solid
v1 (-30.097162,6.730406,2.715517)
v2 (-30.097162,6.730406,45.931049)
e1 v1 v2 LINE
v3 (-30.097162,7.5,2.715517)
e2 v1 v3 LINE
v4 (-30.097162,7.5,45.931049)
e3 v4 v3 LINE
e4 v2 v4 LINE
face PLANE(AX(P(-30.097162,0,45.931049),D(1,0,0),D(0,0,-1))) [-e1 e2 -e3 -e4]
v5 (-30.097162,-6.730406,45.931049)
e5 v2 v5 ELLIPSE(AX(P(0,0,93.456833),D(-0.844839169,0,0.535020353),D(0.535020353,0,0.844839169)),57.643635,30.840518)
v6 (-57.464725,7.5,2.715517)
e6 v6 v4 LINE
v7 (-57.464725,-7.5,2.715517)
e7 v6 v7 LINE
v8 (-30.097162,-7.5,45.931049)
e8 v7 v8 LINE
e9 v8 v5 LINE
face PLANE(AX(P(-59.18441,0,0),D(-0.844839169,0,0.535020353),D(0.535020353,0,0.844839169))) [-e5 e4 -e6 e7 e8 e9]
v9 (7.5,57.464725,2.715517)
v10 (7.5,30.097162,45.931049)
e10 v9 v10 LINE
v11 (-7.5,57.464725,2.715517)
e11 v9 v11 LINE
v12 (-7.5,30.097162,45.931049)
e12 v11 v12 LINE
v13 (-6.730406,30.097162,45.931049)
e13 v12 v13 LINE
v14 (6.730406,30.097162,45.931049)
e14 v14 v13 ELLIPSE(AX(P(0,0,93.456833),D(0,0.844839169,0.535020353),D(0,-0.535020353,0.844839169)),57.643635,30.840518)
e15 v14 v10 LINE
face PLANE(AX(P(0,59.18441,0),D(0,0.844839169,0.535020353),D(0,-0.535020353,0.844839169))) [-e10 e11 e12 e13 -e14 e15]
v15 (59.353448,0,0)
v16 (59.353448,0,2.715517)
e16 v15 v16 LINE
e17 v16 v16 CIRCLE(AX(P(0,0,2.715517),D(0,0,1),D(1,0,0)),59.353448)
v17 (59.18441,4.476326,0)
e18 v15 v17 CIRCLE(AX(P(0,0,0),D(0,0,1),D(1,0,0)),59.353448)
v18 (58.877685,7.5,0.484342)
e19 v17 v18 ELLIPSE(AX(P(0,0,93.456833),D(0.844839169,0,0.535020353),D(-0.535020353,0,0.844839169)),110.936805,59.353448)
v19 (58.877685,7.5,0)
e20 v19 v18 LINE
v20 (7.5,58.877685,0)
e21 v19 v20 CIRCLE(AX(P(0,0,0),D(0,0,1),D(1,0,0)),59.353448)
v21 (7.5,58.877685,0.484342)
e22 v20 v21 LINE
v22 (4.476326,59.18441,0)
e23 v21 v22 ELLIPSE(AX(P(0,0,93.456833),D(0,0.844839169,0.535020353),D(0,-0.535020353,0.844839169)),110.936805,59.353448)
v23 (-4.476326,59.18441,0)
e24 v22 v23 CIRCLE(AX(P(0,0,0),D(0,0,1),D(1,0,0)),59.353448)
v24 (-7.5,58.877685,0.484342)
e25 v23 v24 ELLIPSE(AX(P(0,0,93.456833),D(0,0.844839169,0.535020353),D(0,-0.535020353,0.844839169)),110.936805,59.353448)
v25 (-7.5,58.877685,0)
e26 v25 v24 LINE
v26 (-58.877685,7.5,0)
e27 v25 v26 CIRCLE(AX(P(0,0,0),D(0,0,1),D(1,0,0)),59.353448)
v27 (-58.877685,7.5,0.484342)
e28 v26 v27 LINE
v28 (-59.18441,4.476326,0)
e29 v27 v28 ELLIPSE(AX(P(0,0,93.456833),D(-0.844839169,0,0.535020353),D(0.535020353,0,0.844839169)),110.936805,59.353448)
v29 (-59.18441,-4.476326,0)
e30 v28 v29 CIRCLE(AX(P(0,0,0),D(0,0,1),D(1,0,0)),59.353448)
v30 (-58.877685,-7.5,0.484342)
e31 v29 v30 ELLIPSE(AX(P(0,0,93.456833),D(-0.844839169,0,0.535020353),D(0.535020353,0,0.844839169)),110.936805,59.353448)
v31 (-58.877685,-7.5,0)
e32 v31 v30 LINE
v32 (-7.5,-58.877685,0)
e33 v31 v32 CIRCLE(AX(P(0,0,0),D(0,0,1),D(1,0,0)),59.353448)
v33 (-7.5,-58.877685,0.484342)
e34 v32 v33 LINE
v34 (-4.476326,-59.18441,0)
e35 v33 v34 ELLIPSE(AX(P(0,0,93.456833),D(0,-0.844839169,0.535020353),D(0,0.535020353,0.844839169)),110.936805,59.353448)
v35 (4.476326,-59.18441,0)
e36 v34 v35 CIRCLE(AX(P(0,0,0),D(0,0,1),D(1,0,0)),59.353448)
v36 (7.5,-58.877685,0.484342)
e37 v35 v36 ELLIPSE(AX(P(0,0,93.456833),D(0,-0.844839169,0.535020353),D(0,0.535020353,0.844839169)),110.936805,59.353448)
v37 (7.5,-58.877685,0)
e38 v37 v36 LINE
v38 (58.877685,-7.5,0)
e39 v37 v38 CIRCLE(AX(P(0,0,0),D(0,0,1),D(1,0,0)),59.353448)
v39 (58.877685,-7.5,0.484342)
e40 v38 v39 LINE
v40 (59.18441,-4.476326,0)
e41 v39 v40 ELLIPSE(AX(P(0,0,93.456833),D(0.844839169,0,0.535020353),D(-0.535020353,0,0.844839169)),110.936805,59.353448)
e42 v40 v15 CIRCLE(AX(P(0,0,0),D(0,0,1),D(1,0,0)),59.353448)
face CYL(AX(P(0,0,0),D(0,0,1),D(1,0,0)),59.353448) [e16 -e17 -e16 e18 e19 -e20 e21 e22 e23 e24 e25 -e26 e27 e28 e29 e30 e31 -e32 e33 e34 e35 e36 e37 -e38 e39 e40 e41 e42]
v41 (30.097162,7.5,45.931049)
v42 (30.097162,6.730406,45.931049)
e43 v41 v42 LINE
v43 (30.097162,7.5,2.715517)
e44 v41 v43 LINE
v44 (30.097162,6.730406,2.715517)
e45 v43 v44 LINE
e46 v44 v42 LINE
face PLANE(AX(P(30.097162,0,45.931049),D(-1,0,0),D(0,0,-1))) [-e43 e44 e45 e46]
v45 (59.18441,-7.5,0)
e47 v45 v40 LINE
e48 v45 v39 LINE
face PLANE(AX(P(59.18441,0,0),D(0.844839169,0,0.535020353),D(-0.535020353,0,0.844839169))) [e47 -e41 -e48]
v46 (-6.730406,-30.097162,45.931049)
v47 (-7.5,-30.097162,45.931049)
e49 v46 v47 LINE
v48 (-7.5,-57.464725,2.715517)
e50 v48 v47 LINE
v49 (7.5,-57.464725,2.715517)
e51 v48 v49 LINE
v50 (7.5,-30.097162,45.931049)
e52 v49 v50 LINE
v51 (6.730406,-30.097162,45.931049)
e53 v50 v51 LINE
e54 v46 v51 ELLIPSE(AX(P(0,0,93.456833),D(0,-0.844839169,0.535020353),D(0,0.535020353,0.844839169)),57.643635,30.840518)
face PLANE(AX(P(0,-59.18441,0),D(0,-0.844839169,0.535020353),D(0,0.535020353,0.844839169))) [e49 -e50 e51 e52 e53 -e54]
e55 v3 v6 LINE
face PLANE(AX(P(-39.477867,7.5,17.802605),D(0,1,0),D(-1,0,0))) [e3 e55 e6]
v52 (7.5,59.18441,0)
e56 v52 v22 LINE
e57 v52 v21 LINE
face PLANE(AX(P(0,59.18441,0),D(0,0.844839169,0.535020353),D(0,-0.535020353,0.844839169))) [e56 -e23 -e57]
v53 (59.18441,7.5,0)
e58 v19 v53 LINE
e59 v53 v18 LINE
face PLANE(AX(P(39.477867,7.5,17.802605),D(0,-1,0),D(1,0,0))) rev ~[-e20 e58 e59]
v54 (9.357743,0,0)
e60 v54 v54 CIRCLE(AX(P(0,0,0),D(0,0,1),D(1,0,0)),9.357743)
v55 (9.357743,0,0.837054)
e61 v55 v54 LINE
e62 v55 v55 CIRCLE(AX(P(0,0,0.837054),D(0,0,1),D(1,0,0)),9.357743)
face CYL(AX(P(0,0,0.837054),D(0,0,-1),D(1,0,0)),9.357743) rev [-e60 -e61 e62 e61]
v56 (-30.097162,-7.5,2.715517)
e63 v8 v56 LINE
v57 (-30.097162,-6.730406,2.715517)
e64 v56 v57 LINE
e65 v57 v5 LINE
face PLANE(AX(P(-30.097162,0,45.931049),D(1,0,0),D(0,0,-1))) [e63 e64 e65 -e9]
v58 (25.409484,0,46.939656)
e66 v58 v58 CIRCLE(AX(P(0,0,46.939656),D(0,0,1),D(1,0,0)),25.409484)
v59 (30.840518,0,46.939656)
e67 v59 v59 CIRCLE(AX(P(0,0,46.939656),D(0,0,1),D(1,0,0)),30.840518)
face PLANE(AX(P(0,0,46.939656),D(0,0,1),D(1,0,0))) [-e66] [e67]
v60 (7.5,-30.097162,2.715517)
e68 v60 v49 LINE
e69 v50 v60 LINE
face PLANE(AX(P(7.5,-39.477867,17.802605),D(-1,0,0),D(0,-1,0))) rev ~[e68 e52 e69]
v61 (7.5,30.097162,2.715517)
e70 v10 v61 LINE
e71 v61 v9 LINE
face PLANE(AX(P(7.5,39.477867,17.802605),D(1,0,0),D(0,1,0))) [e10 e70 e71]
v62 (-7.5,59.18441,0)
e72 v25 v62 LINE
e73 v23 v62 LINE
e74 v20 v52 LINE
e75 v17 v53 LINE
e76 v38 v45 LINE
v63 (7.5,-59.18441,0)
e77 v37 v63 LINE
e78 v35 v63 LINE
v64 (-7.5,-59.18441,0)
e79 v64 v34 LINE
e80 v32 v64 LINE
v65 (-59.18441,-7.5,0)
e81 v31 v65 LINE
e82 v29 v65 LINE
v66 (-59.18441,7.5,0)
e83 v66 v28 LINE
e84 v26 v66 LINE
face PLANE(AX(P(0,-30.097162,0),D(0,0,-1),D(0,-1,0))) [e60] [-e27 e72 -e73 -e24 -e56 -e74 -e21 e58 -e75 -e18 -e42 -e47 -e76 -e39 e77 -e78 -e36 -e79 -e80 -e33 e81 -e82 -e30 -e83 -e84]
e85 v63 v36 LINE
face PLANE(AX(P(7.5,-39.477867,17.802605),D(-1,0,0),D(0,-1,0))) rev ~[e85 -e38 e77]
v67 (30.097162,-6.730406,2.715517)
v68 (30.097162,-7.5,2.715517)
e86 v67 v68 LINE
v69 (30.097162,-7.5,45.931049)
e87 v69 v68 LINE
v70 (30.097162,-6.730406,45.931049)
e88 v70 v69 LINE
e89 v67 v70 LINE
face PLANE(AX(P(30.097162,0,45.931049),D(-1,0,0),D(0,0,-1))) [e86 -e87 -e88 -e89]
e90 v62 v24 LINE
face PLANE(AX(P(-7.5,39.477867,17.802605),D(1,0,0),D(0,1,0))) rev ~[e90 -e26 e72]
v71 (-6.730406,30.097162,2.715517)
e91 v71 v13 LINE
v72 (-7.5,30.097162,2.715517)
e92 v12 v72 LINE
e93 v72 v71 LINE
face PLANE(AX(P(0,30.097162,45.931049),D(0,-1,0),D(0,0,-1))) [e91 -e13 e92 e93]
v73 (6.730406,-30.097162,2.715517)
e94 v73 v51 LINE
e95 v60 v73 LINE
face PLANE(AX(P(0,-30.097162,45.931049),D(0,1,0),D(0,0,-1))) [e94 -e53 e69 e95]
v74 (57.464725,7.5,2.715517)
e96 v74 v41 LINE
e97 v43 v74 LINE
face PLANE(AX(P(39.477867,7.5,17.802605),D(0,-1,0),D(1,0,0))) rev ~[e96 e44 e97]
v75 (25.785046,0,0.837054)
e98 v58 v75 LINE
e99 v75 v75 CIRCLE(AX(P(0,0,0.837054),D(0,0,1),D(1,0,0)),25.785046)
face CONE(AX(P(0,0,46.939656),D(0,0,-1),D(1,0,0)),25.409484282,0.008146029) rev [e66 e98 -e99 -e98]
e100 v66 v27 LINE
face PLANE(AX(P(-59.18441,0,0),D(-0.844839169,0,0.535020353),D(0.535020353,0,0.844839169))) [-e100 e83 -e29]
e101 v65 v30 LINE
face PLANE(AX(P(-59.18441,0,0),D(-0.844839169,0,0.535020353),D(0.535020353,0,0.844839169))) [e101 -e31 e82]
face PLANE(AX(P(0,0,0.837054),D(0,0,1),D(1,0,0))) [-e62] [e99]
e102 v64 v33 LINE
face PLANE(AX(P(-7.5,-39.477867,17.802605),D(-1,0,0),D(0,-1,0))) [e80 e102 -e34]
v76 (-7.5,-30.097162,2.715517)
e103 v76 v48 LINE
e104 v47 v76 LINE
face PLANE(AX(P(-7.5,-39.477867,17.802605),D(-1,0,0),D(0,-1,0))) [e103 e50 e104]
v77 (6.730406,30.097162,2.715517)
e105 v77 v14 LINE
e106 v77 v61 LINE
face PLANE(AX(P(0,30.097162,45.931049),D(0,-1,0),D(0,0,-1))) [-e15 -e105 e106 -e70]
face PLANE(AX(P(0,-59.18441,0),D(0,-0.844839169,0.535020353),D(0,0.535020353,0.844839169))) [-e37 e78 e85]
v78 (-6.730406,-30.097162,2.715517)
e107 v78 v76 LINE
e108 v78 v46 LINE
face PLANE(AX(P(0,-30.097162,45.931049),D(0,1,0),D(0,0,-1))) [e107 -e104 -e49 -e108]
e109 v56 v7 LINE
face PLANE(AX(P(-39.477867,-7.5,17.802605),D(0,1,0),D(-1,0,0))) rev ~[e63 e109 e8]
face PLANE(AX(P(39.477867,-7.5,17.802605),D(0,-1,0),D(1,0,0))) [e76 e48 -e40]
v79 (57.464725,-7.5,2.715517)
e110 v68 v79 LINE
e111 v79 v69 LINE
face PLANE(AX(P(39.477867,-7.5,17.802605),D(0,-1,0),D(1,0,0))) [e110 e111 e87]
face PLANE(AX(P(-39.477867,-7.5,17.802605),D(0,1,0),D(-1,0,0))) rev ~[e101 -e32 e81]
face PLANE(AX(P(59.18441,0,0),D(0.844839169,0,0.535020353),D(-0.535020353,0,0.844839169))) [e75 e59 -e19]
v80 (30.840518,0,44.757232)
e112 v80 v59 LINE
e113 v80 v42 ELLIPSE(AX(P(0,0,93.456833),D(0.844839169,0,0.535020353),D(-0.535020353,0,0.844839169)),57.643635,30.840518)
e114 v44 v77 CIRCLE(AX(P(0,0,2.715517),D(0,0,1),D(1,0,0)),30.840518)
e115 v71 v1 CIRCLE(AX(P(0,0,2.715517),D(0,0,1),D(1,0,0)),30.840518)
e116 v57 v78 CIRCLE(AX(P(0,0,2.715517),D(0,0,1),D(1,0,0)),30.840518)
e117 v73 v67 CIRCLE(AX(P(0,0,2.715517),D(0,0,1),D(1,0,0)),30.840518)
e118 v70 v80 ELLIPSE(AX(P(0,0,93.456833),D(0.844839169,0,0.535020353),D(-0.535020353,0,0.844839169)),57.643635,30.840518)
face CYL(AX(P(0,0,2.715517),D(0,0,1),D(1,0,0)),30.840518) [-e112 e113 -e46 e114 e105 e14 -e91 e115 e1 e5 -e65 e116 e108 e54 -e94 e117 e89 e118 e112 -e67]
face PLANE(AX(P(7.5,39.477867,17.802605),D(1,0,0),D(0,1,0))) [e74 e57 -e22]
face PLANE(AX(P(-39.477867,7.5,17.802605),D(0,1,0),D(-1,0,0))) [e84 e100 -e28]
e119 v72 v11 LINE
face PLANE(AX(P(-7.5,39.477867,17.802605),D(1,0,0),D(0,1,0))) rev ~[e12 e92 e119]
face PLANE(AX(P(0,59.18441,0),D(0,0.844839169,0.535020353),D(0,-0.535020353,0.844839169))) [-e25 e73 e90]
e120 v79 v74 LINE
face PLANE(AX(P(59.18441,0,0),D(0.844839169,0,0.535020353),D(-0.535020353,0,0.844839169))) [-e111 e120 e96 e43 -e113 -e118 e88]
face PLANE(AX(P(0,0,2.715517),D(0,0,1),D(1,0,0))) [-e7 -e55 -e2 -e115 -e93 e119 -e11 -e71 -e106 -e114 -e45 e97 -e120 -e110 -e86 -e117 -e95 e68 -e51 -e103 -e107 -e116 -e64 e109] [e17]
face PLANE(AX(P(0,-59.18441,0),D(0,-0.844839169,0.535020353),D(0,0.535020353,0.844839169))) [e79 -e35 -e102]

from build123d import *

# Parameters (mm, degrees)
F4_DEPTH        = 7.5
F4_COPIES_COUNT = 4


# Not quite as in the source:
# - a pattern or mirror of a feature is missing from the dataset's text; its kind, count and spacing are read off the source's solid


with BuildPart() as f2:
    # F0 (on Front) → F2 (revolve)
    with BuildSketch(Plane.XZ):
        Polygon((9.3577429652, 0), (59.3534484506, 0), (59.3534484506, 2.7155173011), (30.840517953, 2.7155173011), (30.840517953, 46.9396561384), (25.4094842821, 46.9396561384), (25.7850456983, 0.8370543364), (9.3577429652, 0.8370543364), align=None)
    revolve(axis=Axis((0, 0, 37.2192747891), (0, 0, 1)))

    # F3 (on Front) → F4 (join, symmetric)
    with BuildSketch(Plane.XZ):
        Polygon((59.184409678, 0), (30.097162351, 45.9310486913), (30.097162351, 0), align=None)
    f4 = extrude(amount=F4_DEPTH, both=True)

    # F4_copies: F4 ×4 about axis
    f4_copies_axis = Axis((0, 0, 0), (0, 0, 1))
    for i in range(1, F4_COPIES_COUNT):
        add(f4.rotate(f4_copies_axis, i * 360 / F4_COPIES_COUNT))


solid = f2.part
